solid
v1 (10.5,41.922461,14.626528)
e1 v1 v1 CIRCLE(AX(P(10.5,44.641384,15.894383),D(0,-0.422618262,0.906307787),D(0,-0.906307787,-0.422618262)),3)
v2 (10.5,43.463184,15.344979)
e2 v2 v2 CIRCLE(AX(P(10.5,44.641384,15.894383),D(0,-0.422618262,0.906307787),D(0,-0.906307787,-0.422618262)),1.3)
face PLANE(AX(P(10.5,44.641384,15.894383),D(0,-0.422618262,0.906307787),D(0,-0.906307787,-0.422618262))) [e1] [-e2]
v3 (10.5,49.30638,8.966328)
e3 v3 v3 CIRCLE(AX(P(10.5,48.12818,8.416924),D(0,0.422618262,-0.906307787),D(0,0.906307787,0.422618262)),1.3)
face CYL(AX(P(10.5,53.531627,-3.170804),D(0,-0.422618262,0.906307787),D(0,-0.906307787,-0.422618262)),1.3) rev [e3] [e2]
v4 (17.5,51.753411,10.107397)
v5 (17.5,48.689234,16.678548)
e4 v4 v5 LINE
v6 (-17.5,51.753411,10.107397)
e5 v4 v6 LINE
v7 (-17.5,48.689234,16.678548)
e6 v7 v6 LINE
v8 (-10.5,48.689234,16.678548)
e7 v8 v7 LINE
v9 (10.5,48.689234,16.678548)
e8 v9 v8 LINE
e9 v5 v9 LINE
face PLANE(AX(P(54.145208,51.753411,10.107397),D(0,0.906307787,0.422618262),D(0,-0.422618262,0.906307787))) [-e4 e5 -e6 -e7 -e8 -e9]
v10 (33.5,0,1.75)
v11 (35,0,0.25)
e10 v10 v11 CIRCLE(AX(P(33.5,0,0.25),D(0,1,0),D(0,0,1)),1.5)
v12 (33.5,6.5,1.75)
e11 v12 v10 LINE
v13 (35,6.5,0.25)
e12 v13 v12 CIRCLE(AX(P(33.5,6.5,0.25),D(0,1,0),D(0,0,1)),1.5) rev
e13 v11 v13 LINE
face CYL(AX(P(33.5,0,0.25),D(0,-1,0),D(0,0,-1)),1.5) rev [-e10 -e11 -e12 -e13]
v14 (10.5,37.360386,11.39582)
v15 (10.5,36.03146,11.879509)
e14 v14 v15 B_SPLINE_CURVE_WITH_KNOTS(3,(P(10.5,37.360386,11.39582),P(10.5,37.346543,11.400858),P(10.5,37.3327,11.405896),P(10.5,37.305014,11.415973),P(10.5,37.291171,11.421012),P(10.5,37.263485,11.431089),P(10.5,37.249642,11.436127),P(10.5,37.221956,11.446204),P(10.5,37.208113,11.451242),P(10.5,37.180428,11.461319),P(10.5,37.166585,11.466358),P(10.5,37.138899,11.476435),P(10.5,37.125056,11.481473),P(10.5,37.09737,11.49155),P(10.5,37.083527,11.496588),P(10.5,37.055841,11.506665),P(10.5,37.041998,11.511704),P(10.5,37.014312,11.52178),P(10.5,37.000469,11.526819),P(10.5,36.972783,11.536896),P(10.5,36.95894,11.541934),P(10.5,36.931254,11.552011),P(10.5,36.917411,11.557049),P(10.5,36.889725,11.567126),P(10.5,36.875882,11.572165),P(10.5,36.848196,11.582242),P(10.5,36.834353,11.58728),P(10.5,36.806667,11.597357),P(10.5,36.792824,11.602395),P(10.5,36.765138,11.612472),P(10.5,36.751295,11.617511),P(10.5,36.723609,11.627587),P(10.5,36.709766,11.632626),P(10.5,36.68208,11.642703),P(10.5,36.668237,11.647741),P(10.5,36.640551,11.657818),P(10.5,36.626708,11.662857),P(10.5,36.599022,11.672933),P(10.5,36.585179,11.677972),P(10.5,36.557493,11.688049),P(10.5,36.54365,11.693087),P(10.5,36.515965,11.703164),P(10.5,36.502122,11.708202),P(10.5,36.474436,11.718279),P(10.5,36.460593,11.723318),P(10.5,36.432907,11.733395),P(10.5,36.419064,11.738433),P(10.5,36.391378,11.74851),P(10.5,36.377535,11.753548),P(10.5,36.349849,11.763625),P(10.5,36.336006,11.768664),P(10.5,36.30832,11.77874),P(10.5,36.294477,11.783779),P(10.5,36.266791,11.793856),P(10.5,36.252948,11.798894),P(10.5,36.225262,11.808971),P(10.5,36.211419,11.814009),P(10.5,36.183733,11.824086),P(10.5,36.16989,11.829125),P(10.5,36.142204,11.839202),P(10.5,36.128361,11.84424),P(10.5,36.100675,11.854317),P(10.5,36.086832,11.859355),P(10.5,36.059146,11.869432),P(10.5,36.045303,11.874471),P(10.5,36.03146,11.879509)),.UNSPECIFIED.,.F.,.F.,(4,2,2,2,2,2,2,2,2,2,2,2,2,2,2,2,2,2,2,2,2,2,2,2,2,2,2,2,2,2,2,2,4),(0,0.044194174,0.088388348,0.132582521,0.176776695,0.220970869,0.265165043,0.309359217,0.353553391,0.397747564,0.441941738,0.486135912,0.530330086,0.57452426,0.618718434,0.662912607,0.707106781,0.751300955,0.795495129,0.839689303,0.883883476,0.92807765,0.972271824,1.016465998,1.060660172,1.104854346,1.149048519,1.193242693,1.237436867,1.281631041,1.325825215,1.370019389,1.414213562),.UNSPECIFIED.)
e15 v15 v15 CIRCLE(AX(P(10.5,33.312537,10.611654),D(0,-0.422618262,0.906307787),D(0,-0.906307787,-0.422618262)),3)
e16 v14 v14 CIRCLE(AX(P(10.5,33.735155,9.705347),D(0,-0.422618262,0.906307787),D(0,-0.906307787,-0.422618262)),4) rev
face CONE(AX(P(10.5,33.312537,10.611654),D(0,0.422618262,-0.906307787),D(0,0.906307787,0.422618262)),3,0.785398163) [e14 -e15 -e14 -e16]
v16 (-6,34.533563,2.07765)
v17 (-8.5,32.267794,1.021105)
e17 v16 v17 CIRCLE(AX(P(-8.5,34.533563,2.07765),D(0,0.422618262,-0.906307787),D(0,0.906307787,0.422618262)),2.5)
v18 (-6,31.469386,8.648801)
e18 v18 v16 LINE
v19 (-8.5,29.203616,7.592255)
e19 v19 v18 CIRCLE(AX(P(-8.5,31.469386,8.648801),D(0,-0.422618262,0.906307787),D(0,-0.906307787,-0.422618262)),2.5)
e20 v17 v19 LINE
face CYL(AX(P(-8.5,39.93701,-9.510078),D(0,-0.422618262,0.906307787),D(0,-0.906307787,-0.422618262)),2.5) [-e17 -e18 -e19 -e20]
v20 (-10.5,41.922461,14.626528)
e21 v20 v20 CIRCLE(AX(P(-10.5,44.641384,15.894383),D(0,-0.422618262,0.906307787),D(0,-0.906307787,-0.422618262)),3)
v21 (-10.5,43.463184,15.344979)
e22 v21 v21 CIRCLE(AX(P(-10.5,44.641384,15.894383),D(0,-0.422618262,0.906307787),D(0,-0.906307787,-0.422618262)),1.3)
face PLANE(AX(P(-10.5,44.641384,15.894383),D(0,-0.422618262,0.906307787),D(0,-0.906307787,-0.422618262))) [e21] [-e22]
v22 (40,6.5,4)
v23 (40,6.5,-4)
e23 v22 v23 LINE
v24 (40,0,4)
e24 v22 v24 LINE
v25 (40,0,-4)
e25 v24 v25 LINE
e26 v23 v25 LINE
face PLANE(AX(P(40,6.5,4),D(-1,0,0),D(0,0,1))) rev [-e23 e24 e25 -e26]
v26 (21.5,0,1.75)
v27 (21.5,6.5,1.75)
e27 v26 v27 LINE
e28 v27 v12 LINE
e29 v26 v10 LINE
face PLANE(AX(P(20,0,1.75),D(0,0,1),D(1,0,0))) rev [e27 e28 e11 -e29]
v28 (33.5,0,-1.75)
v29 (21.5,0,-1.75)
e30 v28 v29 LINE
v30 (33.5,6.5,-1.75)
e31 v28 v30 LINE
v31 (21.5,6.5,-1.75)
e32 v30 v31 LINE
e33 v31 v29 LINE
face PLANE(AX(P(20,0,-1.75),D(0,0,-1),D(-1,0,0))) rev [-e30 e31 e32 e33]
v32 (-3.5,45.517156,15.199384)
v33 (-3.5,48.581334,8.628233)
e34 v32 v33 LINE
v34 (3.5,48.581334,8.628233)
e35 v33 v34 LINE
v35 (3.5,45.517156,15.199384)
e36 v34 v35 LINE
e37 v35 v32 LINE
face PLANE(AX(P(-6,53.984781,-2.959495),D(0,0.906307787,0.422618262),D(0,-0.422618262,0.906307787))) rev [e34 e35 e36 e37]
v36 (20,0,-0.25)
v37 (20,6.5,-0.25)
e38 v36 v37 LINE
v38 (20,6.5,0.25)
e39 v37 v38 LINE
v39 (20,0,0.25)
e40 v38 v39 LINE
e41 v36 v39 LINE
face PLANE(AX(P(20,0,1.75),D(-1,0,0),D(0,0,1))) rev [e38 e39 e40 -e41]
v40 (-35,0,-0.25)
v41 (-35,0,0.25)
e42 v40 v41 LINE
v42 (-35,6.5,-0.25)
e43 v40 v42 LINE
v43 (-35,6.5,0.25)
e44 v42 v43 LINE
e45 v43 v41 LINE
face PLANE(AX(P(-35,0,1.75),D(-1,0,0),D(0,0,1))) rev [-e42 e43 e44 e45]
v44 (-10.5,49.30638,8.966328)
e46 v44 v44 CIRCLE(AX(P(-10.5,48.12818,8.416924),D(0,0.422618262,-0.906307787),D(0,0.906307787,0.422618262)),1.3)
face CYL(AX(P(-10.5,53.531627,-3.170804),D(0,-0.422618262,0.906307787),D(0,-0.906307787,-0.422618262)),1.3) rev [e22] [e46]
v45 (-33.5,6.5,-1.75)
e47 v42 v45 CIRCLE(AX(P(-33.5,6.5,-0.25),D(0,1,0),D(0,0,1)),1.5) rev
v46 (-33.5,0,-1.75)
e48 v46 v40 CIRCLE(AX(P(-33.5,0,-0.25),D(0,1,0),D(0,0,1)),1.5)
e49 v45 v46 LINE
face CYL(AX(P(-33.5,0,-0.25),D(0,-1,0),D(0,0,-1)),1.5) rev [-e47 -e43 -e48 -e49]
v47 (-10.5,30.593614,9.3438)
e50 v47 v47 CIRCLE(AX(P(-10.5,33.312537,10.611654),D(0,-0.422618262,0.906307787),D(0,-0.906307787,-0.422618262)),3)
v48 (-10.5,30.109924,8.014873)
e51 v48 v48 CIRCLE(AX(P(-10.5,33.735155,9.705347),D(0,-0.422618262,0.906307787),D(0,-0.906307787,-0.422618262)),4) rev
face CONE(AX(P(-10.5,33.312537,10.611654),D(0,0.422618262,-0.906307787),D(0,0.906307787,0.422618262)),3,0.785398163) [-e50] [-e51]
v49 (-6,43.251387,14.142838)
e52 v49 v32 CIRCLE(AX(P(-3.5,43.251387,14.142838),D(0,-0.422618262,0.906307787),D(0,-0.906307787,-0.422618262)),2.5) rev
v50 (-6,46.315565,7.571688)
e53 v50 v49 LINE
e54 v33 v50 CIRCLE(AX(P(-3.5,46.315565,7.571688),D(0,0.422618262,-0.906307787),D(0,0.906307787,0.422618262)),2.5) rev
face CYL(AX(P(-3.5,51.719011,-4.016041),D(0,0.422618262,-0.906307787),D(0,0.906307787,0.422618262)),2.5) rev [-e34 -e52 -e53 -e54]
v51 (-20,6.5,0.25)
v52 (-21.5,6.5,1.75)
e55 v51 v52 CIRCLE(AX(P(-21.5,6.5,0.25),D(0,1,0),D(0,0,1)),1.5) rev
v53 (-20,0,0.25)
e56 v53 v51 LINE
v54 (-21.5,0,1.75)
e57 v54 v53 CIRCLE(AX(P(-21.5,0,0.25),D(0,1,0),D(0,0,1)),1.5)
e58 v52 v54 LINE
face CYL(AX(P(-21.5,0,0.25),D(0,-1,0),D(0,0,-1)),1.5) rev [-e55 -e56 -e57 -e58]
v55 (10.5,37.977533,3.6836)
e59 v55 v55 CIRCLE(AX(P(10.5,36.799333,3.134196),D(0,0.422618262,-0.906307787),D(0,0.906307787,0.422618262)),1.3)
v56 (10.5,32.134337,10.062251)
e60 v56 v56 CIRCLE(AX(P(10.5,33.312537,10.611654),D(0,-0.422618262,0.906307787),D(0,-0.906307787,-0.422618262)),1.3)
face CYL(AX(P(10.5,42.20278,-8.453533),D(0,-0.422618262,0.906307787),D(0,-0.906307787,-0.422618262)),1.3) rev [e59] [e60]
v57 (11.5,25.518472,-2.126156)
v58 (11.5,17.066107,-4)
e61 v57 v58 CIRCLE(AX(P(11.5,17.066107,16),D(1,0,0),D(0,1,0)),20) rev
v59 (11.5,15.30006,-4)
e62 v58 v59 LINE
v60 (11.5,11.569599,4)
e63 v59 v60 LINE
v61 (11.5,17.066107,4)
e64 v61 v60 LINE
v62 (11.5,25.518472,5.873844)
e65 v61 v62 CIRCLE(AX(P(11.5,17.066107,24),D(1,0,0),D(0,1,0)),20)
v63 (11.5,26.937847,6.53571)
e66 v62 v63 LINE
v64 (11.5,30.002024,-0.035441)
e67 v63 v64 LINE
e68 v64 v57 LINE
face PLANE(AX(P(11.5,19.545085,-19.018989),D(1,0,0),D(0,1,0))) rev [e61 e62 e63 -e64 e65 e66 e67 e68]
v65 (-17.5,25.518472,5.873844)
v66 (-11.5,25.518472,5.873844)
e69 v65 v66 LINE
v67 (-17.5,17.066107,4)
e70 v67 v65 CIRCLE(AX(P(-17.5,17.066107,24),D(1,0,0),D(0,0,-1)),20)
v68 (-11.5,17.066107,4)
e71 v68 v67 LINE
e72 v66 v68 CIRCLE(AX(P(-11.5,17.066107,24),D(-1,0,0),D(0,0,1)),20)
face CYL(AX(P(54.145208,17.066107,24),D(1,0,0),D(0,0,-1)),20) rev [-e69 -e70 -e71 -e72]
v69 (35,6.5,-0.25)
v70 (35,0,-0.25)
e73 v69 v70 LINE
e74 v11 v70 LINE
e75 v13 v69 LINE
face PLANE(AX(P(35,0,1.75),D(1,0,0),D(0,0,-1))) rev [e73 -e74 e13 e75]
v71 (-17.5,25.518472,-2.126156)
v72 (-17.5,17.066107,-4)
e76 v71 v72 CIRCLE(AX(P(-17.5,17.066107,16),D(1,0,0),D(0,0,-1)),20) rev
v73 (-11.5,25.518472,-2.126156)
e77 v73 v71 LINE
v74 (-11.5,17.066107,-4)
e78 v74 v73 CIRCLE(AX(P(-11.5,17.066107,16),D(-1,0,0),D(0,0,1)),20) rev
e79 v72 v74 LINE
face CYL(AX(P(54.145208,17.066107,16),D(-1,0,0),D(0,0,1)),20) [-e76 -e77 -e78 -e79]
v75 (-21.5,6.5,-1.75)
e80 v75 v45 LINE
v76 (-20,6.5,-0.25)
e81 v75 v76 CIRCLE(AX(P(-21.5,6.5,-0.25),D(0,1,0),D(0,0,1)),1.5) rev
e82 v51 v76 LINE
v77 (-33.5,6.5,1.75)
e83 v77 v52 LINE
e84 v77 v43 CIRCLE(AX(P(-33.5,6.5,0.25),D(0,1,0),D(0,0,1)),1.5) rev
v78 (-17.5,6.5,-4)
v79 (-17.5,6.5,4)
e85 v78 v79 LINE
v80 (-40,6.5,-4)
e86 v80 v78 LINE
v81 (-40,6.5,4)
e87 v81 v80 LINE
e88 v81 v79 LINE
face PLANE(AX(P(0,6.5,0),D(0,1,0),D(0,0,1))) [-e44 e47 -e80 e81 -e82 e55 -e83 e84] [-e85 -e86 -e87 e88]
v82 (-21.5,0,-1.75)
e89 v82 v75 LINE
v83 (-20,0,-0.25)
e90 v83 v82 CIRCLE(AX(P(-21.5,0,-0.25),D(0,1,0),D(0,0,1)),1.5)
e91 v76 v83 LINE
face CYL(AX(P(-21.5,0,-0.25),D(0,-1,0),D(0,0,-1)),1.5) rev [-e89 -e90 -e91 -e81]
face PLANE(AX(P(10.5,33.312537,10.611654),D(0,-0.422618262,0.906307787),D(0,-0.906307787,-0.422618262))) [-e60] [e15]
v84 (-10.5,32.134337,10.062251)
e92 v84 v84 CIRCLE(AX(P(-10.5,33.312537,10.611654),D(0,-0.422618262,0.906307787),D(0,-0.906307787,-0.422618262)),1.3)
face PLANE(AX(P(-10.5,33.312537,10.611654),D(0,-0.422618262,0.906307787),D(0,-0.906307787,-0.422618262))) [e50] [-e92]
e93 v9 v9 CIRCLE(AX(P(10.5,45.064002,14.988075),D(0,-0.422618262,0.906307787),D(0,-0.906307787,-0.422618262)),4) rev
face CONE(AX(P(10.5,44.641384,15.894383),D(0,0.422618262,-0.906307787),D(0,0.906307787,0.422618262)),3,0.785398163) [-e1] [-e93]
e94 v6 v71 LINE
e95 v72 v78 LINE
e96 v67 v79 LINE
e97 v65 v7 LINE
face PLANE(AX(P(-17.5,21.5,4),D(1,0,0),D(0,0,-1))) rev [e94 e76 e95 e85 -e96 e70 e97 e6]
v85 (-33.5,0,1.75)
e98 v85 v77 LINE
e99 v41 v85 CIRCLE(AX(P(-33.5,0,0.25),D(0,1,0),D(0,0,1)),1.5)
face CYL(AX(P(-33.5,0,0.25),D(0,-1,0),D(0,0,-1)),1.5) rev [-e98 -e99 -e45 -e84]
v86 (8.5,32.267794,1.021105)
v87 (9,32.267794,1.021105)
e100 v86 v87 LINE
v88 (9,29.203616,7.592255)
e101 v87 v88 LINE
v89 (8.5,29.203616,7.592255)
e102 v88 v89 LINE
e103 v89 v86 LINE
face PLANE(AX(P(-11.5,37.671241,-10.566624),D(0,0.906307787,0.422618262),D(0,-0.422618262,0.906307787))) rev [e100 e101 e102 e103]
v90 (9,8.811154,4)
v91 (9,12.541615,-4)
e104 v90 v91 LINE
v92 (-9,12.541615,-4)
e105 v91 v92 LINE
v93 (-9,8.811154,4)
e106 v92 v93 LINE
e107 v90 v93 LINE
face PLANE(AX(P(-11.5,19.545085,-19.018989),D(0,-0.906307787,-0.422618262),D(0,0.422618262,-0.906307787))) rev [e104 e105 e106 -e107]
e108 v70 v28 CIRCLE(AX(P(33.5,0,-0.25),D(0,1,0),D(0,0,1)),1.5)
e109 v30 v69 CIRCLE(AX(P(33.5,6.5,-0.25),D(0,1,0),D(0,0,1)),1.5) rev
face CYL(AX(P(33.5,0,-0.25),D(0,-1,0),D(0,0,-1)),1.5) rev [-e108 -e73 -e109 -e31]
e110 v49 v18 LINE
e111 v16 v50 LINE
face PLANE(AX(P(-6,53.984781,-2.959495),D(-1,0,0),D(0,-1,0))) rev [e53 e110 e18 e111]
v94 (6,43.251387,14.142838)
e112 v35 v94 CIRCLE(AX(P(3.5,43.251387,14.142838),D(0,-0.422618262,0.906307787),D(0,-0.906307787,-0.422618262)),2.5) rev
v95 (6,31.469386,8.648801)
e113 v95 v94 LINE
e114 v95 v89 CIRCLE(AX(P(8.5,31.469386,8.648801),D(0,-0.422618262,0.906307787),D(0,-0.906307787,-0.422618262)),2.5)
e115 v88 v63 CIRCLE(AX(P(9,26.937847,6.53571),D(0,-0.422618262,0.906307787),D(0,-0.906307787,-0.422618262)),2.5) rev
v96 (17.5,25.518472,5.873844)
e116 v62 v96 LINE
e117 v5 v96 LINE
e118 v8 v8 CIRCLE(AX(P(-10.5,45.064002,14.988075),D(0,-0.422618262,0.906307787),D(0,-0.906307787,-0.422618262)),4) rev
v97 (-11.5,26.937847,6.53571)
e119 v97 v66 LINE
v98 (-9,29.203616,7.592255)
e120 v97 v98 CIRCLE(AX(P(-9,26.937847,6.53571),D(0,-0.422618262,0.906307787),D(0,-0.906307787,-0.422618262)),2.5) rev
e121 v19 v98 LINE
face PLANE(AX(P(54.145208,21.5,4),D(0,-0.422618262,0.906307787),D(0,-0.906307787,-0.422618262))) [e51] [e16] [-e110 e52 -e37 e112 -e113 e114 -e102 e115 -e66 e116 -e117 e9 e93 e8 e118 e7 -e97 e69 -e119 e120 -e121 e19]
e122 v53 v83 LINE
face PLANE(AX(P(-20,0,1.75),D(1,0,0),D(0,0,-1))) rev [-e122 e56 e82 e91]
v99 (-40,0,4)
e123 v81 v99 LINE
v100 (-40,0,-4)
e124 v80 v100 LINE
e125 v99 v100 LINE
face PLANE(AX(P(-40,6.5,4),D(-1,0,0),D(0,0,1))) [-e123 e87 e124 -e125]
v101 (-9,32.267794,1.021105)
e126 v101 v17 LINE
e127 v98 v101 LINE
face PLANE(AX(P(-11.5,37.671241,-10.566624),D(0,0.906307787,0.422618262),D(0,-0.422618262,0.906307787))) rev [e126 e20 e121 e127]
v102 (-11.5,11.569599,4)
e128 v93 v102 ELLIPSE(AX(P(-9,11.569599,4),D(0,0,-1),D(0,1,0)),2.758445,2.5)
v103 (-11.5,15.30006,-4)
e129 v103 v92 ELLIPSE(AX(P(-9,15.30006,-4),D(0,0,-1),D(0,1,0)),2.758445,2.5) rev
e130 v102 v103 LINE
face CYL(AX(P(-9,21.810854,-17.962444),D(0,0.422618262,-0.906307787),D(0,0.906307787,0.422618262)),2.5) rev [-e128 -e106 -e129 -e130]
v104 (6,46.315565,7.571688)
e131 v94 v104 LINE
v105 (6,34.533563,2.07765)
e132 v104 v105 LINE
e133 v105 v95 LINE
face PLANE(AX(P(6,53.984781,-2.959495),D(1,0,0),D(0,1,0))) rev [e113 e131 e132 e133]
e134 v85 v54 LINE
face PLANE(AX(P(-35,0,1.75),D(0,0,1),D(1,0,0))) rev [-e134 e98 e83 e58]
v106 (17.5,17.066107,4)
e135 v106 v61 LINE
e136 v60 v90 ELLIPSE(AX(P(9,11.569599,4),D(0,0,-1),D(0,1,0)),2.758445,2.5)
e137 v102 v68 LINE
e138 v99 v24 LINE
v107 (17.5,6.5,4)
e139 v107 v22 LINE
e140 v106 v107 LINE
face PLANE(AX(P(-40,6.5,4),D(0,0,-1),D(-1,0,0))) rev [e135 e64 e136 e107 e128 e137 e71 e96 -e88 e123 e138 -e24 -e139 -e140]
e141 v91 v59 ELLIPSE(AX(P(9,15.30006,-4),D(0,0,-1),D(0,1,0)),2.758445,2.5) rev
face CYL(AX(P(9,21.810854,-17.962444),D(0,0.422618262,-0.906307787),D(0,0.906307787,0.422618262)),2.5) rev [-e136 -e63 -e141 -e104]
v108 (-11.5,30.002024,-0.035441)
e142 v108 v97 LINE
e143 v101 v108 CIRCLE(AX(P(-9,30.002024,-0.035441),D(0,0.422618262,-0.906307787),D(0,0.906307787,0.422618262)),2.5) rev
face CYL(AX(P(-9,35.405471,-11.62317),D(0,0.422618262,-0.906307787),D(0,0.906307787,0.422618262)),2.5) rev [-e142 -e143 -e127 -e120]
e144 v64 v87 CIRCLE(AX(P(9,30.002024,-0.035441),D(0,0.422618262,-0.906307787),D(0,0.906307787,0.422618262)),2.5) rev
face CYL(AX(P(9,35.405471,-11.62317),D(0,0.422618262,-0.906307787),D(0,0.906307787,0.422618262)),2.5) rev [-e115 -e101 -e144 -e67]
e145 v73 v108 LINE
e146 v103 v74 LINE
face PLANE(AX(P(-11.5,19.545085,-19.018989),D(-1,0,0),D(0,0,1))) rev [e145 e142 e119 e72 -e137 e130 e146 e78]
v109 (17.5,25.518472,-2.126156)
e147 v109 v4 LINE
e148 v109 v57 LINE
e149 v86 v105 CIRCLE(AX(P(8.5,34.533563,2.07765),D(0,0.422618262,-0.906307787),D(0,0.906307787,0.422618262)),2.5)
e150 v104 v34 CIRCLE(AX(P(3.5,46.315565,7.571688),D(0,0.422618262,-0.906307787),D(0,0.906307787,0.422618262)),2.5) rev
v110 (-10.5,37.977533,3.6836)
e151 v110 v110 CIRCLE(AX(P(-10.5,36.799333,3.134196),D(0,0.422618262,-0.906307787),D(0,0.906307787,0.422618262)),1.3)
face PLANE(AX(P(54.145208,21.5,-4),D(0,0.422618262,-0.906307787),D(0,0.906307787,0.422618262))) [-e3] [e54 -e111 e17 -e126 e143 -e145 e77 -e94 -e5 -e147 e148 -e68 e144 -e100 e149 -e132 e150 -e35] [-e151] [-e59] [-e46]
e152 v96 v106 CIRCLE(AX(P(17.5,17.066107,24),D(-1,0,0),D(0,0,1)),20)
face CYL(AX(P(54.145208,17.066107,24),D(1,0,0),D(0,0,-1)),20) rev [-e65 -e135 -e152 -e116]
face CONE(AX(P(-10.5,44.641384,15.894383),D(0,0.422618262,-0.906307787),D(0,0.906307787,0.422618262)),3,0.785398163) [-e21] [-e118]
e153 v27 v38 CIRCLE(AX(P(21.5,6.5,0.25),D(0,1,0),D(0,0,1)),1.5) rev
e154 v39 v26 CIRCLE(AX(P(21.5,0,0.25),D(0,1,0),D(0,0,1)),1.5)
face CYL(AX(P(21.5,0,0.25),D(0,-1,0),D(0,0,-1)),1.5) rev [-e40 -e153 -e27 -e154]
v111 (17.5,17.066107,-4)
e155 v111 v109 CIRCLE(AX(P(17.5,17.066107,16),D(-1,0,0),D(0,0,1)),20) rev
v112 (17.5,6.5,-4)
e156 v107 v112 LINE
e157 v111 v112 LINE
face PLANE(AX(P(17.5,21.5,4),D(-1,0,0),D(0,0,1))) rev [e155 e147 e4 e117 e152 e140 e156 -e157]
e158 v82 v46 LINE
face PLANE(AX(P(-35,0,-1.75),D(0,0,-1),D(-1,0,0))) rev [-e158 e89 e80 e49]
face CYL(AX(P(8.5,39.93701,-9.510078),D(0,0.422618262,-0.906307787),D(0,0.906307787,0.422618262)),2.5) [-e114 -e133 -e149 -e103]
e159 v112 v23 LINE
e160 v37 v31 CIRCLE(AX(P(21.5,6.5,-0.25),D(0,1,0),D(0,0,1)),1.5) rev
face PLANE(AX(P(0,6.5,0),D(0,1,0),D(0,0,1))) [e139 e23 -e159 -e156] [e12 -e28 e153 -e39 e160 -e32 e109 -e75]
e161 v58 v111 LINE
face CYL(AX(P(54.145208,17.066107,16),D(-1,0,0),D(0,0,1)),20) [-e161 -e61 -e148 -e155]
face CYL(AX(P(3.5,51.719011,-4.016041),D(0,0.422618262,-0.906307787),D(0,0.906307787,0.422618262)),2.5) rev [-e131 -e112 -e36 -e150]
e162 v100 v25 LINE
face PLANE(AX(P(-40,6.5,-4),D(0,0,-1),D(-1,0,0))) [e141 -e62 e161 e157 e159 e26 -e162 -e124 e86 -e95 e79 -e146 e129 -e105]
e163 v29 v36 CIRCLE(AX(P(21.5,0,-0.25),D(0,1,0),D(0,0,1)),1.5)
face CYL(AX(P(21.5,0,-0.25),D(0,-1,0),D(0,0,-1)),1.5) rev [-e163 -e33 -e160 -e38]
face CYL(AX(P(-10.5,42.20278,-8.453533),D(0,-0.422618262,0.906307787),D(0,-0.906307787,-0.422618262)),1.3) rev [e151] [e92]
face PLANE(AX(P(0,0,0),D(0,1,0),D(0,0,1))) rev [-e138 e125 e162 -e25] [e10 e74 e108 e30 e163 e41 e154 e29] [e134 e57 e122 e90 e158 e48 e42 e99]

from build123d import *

# Parameters (mm, degrees)
SKETCH13_W              = 80
SKETCH13_H              = 8
BOSS_EXTRUDE9_DEPTH     = 6.5
SKETCH14_W              = 15
SKETCH14_H              = 3.4999999999999996
CUT_EXTRUDE1_DEPTH      = 41.72161588149469
SKETCH15_W              = 35
SKETCH15_H              = 8
BOSS_EXTRUDE10_DEPTH    = 15
BOSS_EXTRUDE11_DEPTH    = 35
SKETCH17_R              = 3.0000000000000036
SKETCH17_R_2            = 3
BOSS_EXTRUDE12_DEPTH    = 1
SKETCH20_R              = 1.3000000000000023
CUT_EXTRUDE2_DEPTH      = 68.35348577458582
CUT_EXTRUDE3_DEPTH      = 68.33334117794962
CUT_EXTRUDE3_DEPTH_BACK = 68.33334117794962
CUT_EXTRUDE4_DEPTH      = 68.3333411779496
FILLET2_R               = 1.5
CHAMFER1_SIZE           = 1
FILLET3_R               = 20
FILLET4_R               = 2.5


with BuildPart() as part:
    # Sketch13 → Boss-Extrude9 (new body)
    with BuildSketch(Plane(origin=(0, 0, 0), x_dir=(1, 0, 0), z_dir=(0, 1, 0))):
        Rectangle(SKETCH13_W, SKETCH13_H)
    extrude(amount=BOSS_EXTRUDE9_DEPTH)

    # Sketch14 → Cut-Extrude1 (cut, through all)
    with BuildSketch(Plane(origin=(0, 6.5, 0), x_dir=(1, 0, 0), z_dir=(0, 1, 0))):
        Polygon((-35, -1.75), (-20, -1.7499999999999998), (-20, 1.7499999999999998), (-35, 1.75), align=None)
        with Locations((27.5, 0)):
            Rectangle(SKETCH14_W, SKETCH14_H)
    extrude(amount=-CUT_EXTRUDE1_DEPTH, mode=Mode.SUBTRACT)

    # Sketch15 → Boss-Extrude10 (add)
    with BuildSketch(Plane(origin=(0, 6.5, 0), x_dir=(1, 0, 0), z_dir=(0, 1, 0))):
        Rectangle(SKETCH15_W, SKETCH15_H)
    extrude(amount=BOSS_EXTRUDE10_DEPTH)

    # Sketch16 → Boss-Extrude11 (add)
    with BuildSketch(Plane.ZY.offset(17.5)):
        Polygon((4, 21.5), (16.678547852220913, 48.689233611099525), (10.107397413474738, 51.75341138357542), (-4, 21.5), align=None)
    extrude(amount=-BOSS_EXTRUDE11_DEPTH)

    # Sketch17 → Boss-Extrude12 (add)
    with BuildSketch(Plane(origin=(0, 2.307944309631712, -4.949402544155895), x_dir=(1, 0, 0), z_dir=(0, -0.42261826174069717, 0.9063077870366509))):
        with Locations(Location((-10.500000000000005, 47.17609046825079, 0), (0, 0, 90))):
            Circle(SKETCH17_R)
        with Locations(Location((10.499999999999995, 47.17609046825079, 0), (0, 0, 90))):
            Circle(SKETCH17_R_2)
        with Locations(Location((10.499999999999995, 34.67609046825079, 0), (0, 0, 90))):
            Circle(SKETCH17_R_2)
        with Locations(Location((-10.500000000000005, 34.67609046825079, 0), (0, 0, 90))):
            Circle(SKETCH17_R)
    extrude(amount=BOSS_EXTRUDE12_DEPTH)

    # Sketch20 → Cut-Extrude2 (cut, through all)
    with BuildSketch(Plane(origin=(0, 1.885326047891013, -4.043094757119239), x_dir=(1, 0, 0), z_dir=(0, -0.4226182617406972, 0.906307787036651))):
        with Locations(Location((-10.500000000000005, 47.176090468250806, 0), (0, 0, 270))):
            Circle(SKETCH20_R)
        with Locations(Location((10.499999999999995, 47.176090468250806, 0), (0, 0, 270))):
            Circle(SKETCH20_R)
        with Locations(Location((10.499999999999995, 34.67609046825079, 0), (0, 0, 270))):
            Circle(SKETCH20_R)
        with Locations(Location((-10.500000000000005, 34.67609046825079, 0), (0, 0, 270))):
            Circle(SKETCH20_R)
    extrude(amount=-CUT_EXTRUDE2_DEPTH, mode=Mode.SUBTRACT)

    # Sketch21 → Cut-Extrude3 (cut, two sides: drawn at the far end of the back side and taken through both)
    with BuildSketch(Plane(origin=(0, 2.307944309631711, -4.949402544155892), x_dir=(1, 0, 0), z_dir=(0, -0.4226182617406972, 0.906307787036651)).offset(-CUT_EXTRUDE3_DEPTH_BACK)):
        Polygon((-11.500000000000002, 9.676090468250791), (11.499999999999998, 9.676090468250791), (11.499999999999995, 29.67609046825079), (-11.500000000000002, 29.67609046825079), align=None)
    extrude(amount=CUT_EXTRUDE3_DEPTH + CUT_EXTRUDE3_DEPTH_BACK, mode=Mode.SUBTRACT)

    # Sketch22 → Cut-Extrude4 (cut, through all)
    with BuildSketch(Plane(origin=(0, 2.307944309631712, -4.949402544155895), x_dir=(1, 0, 0), z_dir=(0, -0.42261826174069717, 0.9063077870366509))):
        Polygon((-6.000000000000002, 47.676090468250806), (6.000000000000002, 47.676090468250806), (6, 29.676090468250802), (-6, 29.676090468250802), align=None)
    extrude(amount=-CUT_EXTRUDE4_DEPTH, mode=Mode.SUBTRACT)

    # Fillet2
    fillet2_edges = [part.edges().sort_by_distance(p)[0] for p in [
        (-20, 3.25, -1.7499999999999998),
        (-20, 3.25, 1.7499999999999998),
        (-35, 3.25, 1.75),
        (-35, 3.25, -1.75),
        (35, 3.25, -1.7499999999999998),
        (35, 3.25, 1.7499999999999998),
        (20, 3.25, 1.7499999999999998),
        (20, 3.25, -1.7499999999999998),
    ]]
    fillet(fillet2_edges, radius=FILLET2_R)

    # Chamfer1
    chamfer1_edges = [part.edges().sort_by_distance(p)[0] for p in [
        (10.499999999999995, 42.345079101842984, 13.720220020036038),
        (10.499999999999995, 31.016231763884843, 8.437491748277322),
        (-10.500000000000005, 42.345079101842984, 13.720220020036038),
        (-10.500000000000005, 31.01623176388484, 8.43749174827732),
    ]]
    chamfer(chamfer1_edges, length=CHAMFER1_SIZE - 0.0001)  # a hair under: the kernel refuses the full size

    # Fillet3
    fillet3_edges = [part.edges().sort_by_distance(p)[0] for p in [
        (14.5, 21.5, 4),
        (-14.5, 21.5, -4),
        (14.499999999999998, 21.5, -4),
        (-14.5, 21.5, 4),
    ]]
    fillet(fillet3_edges, radius=FILLET3_R)

    # Fillet4
    fillet4_edges = [part.edges().sort_by_distance(p)[0] for p in [
        (11.499999999999998, 10.676384564551352, 0),
        (11.499999999999995, 30.735705076049488, 4.306680005422848),
        (-11.500000000000002, 10.676384564551352, -7.11e-15),
        (-11.500000000000002, 30.735705076049495, 4.306680005422834),
        (-6, 30.7357050760495, 4.306680005422846),
        (6, 30.7357050760495, 4.306680005422846),
        (6.000000000000002, 47.049245242709226, 11.913808716755398),
        (-6.000000000000002, 47.049245242709226, 11.913808716755398),
    ]]
    fillet(fillet4_edges, radius=FILLET4_R)


solid = part.part
